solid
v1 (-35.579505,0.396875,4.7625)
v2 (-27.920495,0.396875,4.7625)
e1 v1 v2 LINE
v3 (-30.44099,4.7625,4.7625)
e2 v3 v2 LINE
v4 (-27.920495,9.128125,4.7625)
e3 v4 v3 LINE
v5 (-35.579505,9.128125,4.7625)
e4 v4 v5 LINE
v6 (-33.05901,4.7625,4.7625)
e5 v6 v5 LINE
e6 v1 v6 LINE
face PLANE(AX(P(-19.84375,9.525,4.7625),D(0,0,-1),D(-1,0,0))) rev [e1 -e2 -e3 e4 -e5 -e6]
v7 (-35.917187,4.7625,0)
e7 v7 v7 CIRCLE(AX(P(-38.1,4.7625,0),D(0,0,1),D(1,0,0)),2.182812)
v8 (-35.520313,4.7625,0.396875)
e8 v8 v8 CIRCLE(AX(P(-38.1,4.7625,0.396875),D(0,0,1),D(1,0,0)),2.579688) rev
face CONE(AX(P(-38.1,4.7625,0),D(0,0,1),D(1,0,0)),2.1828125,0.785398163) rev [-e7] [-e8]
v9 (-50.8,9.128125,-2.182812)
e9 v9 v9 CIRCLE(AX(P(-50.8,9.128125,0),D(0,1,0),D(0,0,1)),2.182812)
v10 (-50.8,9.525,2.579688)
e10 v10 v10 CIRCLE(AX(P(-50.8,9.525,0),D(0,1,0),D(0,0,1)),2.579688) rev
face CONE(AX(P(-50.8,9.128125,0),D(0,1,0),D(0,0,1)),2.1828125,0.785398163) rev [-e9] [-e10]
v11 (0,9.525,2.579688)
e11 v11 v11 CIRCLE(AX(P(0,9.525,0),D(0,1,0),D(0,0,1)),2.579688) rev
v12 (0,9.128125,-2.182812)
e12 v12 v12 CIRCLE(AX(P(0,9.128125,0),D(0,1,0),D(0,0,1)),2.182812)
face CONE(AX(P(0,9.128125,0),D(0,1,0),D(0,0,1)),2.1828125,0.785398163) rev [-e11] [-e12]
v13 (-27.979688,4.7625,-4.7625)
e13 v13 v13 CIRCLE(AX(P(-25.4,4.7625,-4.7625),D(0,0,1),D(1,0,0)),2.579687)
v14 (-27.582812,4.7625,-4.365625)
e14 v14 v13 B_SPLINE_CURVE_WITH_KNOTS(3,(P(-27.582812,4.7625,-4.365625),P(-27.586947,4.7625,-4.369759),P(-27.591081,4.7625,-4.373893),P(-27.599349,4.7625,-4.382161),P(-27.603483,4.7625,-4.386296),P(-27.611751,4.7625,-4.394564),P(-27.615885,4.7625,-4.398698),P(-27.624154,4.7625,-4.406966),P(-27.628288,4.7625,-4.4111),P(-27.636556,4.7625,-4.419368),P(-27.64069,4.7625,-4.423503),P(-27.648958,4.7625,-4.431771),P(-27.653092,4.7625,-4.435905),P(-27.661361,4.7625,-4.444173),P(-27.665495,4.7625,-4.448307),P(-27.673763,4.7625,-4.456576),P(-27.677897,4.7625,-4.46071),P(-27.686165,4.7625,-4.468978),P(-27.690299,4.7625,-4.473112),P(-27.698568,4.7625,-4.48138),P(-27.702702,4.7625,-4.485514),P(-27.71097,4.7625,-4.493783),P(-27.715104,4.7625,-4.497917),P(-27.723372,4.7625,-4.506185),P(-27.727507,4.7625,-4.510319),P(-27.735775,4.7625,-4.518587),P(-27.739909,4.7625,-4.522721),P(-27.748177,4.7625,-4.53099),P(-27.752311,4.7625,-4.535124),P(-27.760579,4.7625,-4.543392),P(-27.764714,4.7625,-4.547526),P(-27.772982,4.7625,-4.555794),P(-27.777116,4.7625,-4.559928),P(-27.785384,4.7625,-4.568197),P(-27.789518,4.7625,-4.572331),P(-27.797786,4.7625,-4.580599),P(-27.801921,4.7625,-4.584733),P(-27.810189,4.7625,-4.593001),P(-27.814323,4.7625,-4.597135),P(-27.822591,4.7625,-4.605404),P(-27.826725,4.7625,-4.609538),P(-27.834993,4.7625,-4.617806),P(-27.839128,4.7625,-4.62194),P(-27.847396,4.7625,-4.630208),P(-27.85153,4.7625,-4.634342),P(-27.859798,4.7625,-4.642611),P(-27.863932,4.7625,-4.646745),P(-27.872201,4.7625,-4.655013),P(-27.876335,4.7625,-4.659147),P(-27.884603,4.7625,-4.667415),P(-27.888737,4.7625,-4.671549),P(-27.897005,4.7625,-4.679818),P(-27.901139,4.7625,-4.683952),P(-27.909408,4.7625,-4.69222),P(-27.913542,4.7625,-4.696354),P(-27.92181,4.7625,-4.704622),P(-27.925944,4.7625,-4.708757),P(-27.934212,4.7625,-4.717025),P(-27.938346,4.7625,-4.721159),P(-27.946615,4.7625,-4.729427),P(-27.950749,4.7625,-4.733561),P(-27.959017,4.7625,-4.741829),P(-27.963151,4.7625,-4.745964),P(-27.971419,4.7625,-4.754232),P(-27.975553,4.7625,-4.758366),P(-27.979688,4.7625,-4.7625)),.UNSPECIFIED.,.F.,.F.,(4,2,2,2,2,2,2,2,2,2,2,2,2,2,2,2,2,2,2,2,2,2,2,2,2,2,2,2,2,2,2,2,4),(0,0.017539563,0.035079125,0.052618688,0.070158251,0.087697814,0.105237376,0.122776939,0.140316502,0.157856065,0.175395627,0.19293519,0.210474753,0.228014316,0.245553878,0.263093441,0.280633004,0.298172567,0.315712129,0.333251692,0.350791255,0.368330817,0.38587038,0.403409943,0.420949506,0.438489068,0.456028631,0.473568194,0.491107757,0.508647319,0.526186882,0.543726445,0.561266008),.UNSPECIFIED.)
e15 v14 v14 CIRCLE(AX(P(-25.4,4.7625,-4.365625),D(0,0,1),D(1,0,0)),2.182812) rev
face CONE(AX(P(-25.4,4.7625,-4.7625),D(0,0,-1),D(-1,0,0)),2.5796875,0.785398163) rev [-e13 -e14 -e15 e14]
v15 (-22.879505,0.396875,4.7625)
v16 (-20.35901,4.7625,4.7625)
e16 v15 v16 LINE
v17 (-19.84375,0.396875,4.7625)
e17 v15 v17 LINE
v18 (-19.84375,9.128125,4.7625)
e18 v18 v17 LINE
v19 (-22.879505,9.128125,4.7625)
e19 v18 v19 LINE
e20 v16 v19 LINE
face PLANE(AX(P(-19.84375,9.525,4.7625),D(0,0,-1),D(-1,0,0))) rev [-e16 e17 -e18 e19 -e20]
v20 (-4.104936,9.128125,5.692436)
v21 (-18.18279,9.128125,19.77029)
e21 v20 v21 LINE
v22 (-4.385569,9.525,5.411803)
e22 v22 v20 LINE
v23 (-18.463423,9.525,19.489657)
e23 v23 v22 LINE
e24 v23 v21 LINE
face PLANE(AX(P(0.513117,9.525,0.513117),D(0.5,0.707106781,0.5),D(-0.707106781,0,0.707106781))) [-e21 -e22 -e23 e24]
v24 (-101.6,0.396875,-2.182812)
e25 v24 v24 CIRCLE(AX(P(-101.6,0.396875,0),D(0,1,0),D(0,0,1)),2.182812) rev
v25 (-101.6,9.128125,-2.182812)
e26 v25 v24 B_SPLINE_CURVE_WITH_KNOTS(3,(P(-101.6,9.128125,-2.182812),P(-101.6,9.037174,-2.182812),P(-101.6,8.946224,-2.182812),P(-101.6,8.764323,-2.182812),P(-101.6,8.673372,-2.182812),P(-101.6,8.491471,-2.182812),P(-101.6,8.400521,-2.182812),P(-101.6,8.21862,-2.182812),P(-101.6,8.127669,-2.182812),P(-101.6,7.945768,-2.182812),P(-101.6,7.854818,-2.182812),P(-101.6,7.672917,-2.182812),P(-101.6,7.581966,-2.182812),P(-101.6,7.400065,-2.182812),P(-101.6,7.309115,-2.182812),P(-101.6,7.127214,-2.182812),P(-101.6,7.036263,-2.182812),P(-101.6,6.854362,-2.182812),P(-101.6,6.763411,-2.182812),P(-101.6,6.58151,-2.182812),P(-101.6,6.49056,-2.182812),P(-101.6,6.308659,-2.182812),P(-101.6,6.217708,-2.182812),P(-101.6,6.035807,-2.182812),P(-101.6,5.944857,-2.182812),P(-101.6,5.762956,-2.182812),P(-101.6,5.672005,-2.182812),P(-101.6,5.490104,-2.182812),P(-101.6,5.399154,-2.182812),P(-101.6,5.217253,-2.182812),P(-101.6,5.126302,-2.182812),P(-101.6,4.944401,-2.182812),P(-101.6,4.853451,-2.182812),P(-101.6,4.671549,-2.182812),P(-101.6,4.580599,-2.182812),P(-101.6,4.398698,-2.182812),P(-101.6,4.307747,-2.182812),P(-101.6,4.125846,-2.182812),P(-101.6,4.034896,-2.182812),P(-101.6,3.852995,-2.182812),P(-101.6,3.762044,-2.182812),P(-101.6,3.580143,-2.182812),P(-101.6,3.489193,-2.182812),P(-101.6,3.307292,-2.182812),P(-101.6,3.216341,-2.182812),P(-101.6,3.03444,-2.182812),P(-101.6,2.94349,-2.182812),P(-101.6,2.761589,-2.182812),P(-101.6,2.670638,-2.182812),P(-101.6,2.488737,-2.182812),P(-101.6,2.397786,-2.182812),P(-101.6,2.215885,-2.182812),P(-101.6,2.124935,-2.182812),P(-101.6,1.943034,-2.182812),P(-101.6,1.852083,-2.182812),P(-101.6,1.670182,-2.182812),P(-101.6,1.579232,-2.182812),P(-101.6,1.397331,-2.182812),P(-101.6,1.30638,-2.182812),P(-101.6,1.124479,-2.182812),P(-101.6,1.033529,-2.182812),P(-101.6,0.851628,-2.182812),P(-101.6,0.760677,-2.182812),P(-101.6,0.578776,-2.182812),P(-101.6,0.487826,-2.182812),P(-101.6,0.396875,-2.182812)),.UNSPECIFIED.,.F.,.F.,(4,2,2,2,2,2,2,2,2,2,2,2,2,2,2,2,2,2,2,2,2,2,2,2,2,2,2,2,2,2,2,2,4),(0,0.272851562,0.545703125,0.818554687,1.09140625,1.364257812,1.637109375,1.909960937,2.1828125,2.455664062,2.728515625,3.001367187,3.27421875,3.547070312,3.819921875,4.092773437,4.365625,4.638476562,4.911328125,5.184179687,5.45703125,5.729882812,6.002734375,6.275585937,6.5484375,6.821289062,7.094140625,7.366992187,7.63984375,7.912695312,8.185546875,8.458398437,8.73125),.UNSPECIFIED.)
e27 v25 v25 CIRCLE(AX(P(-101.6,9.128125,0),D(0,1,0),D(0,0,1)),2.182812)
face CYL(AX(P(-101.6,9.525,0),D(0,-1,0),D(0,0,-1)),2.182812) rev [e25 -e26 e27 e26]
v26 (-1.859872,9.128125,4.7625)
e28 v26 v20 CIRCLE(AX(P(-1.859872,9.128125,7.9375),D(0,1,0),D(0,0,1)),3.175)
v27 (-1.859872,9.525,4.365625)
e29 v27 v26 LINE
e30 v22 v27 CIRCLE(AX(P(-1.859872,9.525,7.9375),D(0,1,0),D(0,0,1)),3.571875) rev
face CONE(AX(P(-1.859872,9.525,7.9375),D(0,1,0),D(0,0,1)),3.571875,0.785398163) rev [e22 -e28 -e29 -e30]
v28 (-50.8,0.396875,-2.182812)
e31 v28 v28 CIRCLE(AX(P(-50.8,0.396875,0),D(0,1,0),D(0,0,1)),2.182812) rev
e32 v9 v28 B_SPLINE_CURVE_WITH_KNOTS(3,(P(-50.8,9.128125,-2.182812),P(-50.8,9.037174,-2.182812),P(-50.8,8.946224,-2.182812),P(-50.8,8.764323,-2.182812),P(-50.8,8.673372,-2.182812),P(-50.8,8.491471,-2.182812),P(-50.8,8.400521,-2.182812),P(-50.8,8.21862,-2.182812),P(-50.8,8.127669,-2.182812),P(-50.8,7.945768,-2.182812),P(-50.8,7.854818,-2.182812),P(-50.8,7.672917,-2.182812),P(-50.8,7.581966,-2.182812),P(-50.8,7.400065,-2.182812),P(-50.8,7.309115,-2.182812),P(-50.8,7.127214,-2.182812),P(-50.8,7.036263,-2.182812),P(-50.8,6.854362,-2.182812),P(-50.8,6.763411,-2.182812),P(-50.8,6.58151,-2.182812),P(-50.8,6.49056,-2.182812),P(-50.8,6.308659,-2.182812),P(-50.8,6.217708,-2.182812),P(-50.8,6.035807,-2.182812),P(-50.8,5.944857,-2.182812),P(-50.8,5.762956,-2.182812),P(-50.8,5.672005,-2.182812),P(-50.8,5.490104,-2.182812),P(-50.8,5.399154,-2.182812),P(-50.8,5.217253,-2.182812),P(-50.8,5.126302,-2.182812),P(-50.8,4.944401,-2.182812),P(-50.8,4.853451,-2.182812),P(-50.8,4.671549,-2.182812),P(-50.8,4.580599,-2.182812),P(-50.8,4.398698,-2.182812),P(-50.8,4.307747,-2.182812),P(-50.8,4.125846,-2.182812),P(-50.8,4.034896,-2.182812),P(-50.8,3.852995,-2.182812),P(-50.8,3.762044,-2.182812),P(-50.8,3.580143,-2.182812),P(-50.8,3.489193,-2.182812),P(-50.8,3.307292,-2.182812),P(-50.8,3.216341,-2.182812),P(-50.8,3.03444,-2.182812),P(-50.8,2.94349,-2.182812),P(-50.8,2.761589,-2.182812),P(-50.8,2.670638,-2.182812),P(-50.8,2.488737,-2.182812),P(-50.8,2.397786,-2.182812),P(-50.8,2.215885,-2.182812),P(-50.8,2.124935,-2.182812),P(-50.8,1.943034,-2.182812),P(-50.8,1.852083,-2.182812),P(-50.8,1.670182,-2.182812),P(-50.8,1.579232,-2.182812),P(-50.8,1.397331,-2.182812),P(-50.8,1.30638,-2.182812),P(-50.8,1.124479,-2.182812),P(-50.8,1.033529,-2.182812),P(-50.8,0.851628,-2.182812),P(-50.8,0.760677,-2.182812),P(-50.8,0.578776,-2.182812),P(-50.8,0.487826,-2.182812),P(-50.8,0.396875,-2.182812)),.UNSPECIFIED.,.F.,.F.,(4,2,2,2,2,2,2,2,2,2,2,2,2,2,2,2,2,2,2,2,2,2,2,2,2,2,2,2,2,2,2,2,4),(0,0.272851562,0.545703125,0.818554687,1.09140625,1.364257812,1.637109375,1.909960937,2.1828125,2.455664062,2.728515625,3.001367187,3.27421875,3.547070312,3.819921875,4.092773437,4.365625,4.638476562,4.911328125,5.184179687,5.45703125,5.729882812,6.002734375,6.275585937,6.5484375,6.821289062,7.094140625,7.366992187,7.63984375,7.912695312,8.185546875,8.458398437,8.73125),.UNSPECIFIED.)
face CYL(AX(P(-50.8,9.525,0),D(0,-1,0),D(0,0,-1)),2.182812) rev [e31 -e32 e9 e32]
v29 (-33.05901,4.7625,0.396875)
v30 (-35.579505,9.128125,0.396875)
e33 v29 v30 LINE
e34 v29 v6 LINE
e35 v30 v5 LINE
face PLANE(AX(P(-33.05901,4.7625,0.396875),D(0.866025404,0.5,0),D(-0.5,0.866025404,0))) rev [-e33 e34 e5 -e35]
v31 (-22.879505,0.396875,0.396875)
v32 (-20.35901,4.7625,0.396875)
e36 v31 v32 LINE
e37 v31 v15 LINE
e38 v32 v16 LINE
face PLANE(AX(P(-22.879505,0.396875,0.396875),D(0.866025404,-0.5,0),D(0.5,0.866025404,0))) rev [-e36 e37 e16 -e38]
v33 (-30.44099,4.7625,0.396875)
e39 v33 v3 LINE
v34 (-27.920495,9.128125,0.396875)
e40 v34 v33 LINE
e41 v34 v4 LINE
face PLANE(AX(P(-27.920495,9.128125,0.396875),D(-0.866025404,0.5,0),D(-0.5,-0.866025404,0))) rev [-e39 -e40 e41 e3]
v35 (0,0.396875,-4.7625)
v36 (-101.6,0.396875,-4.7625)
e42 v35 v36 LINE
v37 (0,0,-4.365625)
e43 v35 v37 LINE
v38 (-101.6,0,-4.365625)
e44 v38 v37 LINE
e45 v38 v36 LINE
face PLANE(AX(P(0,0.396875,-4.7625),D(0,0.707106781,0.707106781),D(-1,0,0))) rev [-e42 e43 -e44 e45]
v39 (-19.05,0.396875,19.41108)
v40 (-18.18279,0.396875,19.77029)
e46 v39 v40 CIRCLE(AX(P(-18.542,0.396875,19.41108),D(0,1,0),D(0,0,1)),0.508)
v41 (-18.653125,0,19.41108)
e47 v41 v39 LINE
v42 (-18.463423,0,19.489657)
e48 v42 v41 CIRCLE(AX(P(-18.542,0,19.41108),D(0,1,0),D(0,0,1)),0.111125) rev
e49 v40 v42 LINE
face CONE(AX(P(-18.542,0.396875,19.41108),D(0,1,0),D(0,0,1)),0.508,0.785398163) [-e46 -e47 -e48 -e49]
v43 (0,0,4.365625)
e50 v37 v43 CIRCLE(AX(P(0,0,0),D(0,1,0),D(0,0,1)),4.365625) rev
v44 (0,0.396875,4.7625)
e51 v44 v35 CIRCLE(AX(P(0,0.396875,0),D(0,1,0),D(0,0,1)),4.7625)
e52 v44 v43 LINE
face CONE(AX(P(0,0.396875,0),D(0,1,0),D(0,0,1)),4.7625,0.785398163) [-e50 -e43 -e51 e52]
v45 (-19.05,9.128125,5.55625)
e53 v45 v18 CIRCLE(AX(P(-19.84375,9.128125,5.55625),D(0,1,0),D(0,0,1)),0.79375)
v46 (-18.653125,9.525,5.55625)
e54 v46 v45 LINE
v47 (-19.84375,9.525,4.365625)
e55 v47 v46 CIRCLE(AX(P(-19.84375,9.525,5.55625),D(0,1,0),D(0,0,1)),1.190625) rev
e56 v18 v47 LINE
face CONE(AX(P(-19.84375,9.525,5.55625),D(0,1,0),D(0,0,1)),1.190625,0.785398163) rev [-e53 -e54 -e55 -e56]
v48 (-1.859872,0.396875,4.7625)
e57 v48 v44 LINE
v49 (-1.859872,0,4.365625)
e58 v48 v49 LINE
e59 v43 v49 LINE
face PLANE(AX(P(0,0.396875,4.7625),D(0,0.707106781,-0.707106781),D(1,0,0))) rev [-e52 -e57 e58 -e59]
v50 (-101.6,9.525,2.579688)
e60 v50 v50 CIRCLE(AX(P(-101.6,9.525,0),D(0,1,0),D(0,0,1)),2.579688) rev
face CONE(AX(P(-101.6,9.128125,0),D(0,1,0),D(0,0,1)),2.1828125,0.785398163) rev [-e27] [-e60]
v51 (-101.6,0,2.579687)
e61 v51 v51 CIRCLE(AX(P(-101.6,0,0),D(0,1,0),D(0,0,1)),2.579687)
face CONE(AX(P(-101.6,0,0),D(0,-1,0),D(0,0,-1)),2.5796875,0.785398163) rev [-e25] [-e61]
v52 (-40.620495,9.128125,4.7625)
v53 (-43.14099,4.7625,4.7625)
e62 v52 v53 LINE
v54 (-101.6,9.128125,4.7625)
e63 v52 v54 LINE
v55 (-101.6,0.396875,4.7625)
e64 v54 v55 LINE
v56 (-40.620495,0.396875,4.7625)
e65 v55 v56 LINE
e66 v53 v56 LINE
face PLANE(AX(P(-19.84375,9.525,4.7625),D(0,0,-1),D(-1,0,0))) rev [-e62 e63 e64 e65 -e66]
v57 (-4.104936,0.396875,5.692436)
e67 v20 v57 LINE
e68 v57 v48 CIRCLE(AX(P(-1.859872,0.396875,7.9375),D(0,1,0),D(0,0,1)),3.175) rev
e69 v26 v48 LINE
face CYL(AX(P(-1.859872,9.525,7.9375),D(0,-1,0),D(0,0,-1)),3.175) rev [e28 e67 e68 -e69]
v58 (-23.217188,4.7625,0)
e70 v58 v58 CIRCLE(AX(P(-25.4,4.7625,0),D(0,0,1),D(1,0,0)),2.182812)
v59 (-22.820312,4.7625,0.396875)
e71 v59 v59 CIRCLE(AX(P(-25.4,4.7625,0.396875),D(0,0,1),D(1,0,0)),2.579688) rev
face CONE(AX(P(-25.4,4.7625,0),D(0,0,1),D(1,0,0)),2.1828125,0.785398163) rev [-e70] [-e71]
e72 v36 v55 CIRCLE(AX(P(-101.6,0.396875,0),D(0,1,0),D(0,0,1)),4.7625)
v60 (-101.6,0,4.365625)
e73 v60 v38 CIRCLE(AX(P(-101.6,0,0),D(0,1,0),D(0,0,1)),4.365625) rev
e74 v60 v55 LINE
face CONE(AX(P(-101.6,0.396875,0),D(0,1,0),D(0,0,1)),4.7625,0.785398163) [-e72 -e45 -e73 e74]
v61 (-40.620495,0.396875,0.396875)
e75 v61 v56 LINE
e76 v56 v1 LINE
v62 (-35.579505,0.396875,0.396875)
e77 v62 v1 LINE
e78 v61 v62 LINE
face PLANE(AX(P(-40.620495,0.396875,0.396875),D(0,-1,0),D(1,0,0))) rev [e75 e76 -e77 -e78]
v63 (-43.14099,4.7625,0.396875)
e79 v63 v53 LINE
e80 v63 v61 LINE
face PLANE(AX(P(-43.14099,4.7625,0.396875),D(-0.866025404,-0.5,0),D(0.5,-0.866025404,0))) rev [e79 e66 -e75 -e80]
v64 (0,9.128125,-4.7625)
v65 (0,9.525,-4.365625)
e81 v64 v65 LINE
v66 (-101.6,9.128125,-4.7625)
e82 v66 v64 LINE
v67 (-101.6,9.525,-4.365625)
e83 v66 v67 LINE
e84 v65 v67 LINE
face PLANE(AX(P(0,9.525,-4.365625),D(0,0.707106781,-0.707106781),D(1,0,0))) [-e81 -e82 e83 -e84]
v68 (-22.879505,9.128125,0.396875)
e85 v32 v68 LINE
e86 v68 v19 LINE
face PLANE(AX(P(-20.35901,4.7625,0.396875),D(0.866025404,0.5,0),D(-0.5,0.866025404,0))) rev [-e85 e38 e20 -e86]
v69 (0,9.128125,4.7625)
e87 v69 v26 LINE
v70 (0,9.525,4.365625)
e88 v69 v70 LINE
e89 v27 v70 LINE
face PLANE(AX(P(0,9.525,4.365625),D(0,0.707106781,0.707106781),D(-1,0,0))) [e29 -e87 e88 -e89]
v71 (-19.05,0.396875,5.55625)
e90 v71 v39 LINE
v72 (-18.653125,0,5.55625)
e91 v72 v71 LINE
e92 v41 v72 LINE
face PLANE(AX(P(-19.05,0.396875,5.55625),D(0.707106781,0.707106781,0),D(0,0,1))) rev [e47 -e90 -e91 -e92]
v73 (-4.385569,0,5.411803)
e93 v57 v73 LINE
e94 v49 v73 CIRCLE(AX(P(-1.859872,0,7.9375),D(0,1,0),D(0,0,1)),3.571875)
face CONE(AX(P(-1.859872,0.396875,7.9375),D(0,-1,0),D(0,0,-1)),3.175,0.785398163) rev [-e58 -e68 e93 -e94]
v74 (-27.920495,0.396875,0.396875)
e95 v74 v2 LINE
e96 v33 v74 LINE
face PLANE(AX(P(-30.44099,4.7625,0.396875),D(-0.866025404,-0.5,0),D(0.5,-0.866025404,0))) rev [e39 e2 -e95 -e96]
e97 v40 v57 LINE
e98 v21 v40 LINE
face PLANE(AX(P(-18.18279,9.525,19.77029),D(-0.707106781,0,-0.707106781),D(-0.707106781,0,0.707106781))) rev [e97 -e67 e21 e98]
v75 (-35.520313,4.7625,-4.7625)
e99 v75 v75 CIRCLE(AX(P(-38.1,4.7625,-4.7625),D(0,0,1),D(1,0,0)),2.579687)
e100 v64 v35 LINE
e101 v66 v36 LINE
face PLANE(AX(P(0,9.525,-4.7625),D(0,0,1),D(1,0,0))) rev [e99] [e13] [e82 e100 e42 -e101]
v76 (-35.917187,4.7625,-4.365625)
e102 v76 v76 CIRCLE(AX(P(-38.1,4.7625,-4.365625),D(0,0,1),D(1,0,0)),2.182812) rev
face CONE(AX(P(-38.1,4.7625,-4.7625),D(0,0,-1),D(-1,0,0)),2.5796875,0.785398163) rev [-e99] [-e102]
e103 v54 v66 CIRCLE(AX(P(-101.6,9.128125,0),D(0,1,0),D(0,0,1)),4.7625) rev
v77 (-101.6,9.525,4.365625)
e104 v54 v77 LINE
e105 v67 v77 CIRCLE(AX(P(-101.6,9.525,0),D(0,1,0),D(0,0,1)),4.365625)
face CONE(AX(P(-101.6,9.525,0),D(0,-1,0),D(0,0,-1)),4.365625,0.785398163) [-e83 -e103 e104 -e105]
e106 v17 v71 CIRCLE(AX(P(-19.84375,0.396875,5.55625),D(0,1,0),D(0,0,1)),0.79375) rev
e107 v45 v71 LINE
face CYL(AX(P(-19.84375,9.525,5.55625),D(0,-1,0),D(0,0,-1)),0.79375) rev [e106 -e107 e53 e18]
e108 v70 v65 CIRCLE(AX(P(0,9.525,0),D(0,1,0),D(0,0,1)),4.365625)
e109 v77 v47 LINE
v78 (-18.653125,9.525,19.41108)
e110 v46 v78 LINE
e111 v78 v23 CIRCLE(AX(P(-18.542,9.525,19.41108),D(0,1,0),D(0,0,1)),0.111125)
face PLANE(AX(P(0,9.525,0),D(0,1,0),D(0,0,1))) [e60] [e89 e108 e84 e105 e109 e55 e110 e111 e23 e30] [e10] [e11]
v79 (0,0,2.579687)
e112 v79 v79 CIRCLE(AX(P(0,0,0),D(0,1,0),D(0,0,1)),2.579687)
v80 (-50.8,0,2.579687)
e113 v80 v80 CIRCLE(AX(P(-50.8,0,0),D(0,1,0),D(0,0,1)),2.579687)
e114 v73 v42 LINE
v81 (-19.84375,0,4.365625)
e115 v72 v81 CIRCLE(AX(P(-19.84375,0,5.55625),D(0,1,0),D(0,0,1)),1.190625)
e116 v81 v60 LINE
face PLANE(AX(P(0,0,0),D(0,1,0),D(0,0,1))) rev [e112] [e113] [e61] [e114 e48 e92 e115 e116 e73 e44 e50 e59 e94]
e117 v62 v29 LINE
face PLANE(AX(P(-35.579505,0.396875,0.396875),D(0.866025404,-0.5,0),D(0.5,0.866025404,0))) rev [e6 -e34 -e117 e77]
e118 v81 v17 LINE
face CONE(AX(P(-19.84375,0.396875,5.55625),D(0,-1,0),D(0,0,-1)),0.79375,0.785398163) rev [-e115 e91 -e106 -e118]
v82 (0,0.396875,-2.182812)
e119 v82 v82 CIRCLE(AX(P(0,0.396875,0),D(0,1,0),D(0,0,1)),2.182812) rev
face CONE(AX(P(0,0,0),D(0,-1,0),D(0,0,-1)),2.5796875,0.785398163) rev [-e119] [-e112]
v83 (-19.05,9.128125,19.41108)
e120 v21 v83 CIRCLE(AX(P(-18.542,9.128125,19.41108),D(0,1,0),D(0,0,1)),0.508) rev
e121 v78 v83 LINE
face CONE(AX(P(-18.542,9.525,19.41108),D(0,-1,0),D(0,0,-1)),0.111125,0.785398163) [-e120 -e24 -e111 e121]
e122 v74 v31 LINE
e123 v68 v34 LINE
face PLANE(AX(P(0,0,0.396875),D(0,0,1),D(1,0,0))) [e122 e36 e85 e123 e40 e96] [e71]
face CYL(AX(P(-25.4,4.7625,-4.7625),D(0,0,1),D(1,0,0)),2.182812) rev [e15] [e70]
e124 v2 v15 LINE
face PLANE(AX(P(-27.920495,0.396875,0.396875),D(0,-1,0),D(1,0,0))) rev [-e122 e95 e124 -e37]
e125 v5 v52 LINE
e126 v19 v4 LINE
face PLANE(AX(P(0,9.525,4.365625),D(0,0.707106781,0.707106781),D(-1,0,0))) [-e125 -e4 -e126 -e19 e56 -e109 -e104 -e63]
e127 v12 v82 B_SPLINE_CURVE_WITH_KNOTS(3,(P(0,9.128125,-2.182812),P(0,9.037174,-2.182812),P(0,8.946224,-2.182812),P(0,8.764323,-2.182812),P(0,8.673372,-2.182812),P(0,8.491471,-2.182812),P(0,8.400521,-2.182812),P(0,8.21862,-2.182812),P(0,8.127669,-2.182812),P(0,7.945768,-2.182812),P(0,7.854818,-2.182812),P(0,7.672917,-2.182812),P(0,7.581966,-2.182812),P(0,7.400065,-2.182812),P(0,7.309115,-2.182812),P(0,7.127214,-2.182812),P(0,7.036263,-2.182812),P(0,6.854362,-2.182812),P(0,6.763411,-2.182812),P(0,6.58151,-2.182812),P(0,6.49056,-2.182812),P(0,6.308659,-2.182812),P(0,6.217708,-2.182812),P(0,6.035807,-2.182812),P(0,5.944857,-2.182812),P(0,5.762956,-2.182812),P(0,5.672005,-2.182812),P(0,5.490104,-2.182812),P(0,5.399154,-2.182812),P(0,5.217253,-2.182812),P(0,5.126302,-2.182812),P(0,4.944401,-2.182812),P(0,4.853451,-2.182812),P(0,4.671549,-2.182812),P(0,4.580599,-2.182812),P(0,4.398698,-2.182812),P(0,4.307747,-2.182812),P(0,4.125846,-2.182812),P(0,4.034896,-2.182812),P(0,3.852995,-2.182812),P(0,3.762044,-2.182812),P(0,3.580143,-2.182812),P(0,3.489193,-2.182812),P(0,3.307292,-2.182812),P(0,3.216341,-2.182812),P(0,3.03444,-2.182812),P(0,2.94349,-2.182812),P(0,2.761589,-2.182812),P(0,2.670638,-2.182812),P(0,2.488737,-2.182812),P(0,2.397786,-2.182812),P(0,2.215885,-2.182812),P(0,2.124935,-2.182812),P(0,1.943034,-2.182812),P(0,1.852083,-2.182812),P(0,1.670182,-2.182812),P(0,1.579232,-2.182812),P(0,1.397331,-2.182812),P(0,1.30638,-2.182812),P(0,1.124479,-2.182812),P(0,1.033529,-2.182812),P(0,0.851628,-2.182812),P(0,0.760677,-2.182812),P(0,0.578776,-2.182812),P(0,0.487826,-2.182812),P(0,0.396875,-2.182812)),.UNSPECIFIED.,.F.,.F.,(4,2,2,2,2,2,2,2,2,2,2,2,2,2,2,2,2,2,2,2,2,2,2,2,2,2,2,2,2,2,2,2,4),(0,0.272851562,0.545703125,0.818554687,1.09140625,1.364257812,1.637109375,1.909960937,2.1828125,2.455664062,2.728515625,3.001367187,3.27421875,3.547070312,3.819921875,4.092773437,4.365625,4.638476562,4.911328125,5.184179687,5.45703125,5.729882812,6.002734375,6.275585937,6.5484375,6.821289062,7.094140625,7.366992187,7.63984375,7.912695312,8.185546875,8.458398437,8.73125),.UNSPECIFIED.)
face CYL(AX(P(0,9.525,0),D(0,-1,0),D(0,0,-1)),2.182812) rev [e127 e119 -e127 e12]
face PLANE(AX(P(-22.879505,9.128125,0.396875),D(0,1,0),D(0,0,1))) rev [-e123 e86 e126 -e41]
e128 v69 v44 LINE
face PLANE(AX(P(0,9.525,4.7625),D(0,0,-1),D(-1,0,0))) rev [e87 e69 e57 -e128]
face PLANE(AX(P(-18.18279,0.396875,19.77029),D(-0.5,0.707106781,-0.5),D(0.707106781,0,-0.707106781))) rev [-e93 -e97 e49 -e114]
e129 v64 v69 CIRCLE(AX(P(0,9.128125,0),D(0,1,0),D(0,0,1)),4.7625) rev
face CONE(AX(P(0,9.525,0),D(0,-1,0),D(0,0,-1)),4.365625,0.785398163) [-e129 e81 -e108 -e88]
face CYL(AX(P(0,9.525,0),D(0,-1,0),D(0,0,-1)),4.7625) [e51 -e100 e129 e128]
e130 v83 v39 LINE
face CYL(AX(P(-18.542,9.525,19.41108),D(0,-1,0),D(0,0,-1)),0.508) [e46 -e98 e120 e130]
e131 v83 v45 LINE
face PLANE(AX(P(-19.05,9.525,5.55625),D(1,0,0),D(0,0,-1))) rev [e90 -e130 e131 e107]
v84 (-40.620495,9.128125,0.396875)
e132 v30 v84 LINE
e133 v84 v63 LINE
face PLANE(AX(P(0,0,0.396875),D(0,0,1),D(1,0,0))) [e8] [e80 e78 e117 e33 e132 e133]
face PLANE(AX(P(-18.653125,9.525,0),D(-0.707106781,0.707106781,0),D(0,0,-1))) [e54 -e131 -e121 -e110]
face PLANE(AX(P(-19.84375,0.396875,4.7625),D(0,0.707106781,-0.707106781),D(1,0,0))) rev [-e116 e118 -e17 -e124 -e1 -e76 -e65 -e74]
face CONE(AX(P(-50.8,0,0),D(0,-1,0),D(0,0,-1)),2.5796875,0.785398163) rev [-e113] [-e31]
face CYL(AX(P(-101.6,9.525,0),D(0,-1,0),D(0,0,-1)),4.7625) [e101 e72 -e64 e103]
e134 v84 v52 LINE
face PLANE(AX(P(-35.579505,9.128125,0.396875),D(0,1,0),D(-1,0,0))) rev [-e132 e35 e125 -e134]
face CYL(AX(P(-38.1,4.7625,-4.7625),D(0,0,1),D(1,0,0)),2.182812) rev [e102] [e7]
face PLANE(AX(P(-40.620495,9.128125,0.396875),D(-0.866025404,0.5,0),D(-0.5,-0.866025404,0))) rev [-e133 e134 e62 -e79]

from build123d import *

# Parameters (mm, degrees)
SKETCH1_R               = 2.1828125
BOSS_EXTRUDE1_DEPTH     = 9.525
CUT_EXTRUDE2_DEPTH      = 4.365625
CUT_EXTRUDE3_DEPTH      = 109.557926934
CUT_EXTRUDE3_DEPTH_BACK = 109.557926934
SKETCH6_R               = 2.1828125
CHAMFER1_SIZE           = 0.396875


with BuildPart() as part:
    # Sketch1 → Boss-Extrude1 (new body)
    with BuildSketch(Plane(origin=(0, 0, 0), x_dir=(1, 0, 0), z_dir=(0, 1, 0))):
        with BuildLine():
            Line((0, -4.7625), (-1.859871939, -4.7625))
            ThreePointArc((-1.859871939, -4.7625), (-3.074891837, -5.004182484), (-4.10493597, -5.69243597))
            Line((-4.10493597, -5.69243597), (-18.182789755, -19.770289755))
            ThreePointArc((-18.182789755, -19.770289755), (-18.736403184, -19.880410313), (-19.05, -19.41107951))
            Line((-19.05, -19.41107951), (-19.05, -5.55625))
            ThreePointArc((-19.05, -5.55625), (-19.282483992, -4.994983992), (-19.84375, -4.7625))
            Line((-19.84375, -4.7625), (-101.6, -4.7625))
            ThreePointArc((-101.6, -4.7625), (-106.3625, 0), (-101.6, 4.7625))
            Line((-101.6, 4.7625), (0, 4.7625))
            ThreePointArc((0, 4.7625), (4.7625, 0), (0, -4.7625))
        make_face()
        with Locations(Location((0, 0, 0), (0, 0, 90))):
            Circle(SKETCH1_R, mode=Mode.SUBTRACT)
        with Locations(Location((-50.8, 0, 0), (0, 0, 90))):
            Circle(SKETCH1_R, mode=Mode.SUBTRACT)
        with Locations(Location((-101.6, 0, 0), (0, 0, 90))):
            Circle(SKETCH1_R, mode=Mode.SUBTRACT)
    extrude(amount=BOSS_EXTRUDE1_DEPTH)

    # Sketch5 → Cut-Extrude2 (cut)
    with BuildSketch(Plane.XY.offset(4.7625)):
        Polygon((-20.359010462, 4.7625), (-22.879505231, 9.128125), (-27.920494769, 9.128125), (-30.440989538, 4.7625), (-27.920494769, 0.396875), (-22.879505231, 0.396875), align=None)
        Polygon((-33.059010462, 4.7625), (-35.579505231, 9.128125), (-40.620494769, 9.128125), (-43.140989538, 4.7625), (-40.620494769, 0.396875), (-35.579505231, 0.396875), align=None)
    extrude(amount=-CUT_EXTRUDE2_DEPTH, mode=Mode.SUBTRACT)

    # Sketch6 → Cut-Extrude3 (cut, two sides: drawn at the far end of the back side and taken through both)
    with BuildSketch(Plane.XY.offset(0.396875).offset(-CUT_EXTRUDE3_DEPTH_BACK)):
        with Locations((-38.1, 4.7625)):
            Circle(SKETCH6_R)
        with Locations((-25.4, 4.7625)):
            Circle(SKETCH6_R)
    extrude(amount=CUT_EXTRUDE3_DEPTH + CUT_EXTRUDE3_DEPTH_BACK, mode=Mode.SUBTRACT)

    # Chamfer1
    chamfer1_edges = [part.edges().sort_by_distance(p)[0] for p in [
        (-0.92993597, 0, 4.7625),
        (-3.074891837, 0, 5.004182484),
        (-11.143862862, 0, 12.731362862),
        (-18.736403184, 0, 19.880410313),
        (-19.05, 0, 12.483664755),
        (-19.282483992, 0, 4.994983992),
        (-60.721875, 0, 4.7625),
        (-106.3625, 9.525, 0),
        (-106.3625, 0, 0),
        (-50.8, 0, -4.7625),
        (4.7625, 0, 0),
        (-60.721875, 9.525, 4.7625),
        (-19.282483992, 9.525, 4.994983992),
        (-19.05, 9.525, 12.483664755),
        (0, 0, 2.1828125),
        (0, 9.525, 2.1828125),
        (-18.736403184, 9.525, 19.880410313),
        (-50.8, 0, 2.1828125),
        (-50.8, 9.525, 2.1828125),
        (-11.143862862, 9.525, 12.731362862),
        (-101.6, 0, 2.1828125),
        (-101.6, 9.525, 2.1828125),
        (-3.074891837, 9.525, 5.004182484),
        (-0.92993597, 9.525, 4.7625),
        (4.7625, 9.525, 0),
        (-40.2828125, 4.7625, 0.396875),
        (-40.2828125, 4.7625, -4.7625),
        (-27.5828125, 4.7625, 0.396875),
        (-27.5828125, 4.7625, -4.7625),
        (-50.8, 9.525, -4.7625),
    ]]
    chamfer(chamfer1_edges, length=CHAMFER1_SIZE - 0.0001)  # a hair under: the kernel refuses the full size


solid = part.part
